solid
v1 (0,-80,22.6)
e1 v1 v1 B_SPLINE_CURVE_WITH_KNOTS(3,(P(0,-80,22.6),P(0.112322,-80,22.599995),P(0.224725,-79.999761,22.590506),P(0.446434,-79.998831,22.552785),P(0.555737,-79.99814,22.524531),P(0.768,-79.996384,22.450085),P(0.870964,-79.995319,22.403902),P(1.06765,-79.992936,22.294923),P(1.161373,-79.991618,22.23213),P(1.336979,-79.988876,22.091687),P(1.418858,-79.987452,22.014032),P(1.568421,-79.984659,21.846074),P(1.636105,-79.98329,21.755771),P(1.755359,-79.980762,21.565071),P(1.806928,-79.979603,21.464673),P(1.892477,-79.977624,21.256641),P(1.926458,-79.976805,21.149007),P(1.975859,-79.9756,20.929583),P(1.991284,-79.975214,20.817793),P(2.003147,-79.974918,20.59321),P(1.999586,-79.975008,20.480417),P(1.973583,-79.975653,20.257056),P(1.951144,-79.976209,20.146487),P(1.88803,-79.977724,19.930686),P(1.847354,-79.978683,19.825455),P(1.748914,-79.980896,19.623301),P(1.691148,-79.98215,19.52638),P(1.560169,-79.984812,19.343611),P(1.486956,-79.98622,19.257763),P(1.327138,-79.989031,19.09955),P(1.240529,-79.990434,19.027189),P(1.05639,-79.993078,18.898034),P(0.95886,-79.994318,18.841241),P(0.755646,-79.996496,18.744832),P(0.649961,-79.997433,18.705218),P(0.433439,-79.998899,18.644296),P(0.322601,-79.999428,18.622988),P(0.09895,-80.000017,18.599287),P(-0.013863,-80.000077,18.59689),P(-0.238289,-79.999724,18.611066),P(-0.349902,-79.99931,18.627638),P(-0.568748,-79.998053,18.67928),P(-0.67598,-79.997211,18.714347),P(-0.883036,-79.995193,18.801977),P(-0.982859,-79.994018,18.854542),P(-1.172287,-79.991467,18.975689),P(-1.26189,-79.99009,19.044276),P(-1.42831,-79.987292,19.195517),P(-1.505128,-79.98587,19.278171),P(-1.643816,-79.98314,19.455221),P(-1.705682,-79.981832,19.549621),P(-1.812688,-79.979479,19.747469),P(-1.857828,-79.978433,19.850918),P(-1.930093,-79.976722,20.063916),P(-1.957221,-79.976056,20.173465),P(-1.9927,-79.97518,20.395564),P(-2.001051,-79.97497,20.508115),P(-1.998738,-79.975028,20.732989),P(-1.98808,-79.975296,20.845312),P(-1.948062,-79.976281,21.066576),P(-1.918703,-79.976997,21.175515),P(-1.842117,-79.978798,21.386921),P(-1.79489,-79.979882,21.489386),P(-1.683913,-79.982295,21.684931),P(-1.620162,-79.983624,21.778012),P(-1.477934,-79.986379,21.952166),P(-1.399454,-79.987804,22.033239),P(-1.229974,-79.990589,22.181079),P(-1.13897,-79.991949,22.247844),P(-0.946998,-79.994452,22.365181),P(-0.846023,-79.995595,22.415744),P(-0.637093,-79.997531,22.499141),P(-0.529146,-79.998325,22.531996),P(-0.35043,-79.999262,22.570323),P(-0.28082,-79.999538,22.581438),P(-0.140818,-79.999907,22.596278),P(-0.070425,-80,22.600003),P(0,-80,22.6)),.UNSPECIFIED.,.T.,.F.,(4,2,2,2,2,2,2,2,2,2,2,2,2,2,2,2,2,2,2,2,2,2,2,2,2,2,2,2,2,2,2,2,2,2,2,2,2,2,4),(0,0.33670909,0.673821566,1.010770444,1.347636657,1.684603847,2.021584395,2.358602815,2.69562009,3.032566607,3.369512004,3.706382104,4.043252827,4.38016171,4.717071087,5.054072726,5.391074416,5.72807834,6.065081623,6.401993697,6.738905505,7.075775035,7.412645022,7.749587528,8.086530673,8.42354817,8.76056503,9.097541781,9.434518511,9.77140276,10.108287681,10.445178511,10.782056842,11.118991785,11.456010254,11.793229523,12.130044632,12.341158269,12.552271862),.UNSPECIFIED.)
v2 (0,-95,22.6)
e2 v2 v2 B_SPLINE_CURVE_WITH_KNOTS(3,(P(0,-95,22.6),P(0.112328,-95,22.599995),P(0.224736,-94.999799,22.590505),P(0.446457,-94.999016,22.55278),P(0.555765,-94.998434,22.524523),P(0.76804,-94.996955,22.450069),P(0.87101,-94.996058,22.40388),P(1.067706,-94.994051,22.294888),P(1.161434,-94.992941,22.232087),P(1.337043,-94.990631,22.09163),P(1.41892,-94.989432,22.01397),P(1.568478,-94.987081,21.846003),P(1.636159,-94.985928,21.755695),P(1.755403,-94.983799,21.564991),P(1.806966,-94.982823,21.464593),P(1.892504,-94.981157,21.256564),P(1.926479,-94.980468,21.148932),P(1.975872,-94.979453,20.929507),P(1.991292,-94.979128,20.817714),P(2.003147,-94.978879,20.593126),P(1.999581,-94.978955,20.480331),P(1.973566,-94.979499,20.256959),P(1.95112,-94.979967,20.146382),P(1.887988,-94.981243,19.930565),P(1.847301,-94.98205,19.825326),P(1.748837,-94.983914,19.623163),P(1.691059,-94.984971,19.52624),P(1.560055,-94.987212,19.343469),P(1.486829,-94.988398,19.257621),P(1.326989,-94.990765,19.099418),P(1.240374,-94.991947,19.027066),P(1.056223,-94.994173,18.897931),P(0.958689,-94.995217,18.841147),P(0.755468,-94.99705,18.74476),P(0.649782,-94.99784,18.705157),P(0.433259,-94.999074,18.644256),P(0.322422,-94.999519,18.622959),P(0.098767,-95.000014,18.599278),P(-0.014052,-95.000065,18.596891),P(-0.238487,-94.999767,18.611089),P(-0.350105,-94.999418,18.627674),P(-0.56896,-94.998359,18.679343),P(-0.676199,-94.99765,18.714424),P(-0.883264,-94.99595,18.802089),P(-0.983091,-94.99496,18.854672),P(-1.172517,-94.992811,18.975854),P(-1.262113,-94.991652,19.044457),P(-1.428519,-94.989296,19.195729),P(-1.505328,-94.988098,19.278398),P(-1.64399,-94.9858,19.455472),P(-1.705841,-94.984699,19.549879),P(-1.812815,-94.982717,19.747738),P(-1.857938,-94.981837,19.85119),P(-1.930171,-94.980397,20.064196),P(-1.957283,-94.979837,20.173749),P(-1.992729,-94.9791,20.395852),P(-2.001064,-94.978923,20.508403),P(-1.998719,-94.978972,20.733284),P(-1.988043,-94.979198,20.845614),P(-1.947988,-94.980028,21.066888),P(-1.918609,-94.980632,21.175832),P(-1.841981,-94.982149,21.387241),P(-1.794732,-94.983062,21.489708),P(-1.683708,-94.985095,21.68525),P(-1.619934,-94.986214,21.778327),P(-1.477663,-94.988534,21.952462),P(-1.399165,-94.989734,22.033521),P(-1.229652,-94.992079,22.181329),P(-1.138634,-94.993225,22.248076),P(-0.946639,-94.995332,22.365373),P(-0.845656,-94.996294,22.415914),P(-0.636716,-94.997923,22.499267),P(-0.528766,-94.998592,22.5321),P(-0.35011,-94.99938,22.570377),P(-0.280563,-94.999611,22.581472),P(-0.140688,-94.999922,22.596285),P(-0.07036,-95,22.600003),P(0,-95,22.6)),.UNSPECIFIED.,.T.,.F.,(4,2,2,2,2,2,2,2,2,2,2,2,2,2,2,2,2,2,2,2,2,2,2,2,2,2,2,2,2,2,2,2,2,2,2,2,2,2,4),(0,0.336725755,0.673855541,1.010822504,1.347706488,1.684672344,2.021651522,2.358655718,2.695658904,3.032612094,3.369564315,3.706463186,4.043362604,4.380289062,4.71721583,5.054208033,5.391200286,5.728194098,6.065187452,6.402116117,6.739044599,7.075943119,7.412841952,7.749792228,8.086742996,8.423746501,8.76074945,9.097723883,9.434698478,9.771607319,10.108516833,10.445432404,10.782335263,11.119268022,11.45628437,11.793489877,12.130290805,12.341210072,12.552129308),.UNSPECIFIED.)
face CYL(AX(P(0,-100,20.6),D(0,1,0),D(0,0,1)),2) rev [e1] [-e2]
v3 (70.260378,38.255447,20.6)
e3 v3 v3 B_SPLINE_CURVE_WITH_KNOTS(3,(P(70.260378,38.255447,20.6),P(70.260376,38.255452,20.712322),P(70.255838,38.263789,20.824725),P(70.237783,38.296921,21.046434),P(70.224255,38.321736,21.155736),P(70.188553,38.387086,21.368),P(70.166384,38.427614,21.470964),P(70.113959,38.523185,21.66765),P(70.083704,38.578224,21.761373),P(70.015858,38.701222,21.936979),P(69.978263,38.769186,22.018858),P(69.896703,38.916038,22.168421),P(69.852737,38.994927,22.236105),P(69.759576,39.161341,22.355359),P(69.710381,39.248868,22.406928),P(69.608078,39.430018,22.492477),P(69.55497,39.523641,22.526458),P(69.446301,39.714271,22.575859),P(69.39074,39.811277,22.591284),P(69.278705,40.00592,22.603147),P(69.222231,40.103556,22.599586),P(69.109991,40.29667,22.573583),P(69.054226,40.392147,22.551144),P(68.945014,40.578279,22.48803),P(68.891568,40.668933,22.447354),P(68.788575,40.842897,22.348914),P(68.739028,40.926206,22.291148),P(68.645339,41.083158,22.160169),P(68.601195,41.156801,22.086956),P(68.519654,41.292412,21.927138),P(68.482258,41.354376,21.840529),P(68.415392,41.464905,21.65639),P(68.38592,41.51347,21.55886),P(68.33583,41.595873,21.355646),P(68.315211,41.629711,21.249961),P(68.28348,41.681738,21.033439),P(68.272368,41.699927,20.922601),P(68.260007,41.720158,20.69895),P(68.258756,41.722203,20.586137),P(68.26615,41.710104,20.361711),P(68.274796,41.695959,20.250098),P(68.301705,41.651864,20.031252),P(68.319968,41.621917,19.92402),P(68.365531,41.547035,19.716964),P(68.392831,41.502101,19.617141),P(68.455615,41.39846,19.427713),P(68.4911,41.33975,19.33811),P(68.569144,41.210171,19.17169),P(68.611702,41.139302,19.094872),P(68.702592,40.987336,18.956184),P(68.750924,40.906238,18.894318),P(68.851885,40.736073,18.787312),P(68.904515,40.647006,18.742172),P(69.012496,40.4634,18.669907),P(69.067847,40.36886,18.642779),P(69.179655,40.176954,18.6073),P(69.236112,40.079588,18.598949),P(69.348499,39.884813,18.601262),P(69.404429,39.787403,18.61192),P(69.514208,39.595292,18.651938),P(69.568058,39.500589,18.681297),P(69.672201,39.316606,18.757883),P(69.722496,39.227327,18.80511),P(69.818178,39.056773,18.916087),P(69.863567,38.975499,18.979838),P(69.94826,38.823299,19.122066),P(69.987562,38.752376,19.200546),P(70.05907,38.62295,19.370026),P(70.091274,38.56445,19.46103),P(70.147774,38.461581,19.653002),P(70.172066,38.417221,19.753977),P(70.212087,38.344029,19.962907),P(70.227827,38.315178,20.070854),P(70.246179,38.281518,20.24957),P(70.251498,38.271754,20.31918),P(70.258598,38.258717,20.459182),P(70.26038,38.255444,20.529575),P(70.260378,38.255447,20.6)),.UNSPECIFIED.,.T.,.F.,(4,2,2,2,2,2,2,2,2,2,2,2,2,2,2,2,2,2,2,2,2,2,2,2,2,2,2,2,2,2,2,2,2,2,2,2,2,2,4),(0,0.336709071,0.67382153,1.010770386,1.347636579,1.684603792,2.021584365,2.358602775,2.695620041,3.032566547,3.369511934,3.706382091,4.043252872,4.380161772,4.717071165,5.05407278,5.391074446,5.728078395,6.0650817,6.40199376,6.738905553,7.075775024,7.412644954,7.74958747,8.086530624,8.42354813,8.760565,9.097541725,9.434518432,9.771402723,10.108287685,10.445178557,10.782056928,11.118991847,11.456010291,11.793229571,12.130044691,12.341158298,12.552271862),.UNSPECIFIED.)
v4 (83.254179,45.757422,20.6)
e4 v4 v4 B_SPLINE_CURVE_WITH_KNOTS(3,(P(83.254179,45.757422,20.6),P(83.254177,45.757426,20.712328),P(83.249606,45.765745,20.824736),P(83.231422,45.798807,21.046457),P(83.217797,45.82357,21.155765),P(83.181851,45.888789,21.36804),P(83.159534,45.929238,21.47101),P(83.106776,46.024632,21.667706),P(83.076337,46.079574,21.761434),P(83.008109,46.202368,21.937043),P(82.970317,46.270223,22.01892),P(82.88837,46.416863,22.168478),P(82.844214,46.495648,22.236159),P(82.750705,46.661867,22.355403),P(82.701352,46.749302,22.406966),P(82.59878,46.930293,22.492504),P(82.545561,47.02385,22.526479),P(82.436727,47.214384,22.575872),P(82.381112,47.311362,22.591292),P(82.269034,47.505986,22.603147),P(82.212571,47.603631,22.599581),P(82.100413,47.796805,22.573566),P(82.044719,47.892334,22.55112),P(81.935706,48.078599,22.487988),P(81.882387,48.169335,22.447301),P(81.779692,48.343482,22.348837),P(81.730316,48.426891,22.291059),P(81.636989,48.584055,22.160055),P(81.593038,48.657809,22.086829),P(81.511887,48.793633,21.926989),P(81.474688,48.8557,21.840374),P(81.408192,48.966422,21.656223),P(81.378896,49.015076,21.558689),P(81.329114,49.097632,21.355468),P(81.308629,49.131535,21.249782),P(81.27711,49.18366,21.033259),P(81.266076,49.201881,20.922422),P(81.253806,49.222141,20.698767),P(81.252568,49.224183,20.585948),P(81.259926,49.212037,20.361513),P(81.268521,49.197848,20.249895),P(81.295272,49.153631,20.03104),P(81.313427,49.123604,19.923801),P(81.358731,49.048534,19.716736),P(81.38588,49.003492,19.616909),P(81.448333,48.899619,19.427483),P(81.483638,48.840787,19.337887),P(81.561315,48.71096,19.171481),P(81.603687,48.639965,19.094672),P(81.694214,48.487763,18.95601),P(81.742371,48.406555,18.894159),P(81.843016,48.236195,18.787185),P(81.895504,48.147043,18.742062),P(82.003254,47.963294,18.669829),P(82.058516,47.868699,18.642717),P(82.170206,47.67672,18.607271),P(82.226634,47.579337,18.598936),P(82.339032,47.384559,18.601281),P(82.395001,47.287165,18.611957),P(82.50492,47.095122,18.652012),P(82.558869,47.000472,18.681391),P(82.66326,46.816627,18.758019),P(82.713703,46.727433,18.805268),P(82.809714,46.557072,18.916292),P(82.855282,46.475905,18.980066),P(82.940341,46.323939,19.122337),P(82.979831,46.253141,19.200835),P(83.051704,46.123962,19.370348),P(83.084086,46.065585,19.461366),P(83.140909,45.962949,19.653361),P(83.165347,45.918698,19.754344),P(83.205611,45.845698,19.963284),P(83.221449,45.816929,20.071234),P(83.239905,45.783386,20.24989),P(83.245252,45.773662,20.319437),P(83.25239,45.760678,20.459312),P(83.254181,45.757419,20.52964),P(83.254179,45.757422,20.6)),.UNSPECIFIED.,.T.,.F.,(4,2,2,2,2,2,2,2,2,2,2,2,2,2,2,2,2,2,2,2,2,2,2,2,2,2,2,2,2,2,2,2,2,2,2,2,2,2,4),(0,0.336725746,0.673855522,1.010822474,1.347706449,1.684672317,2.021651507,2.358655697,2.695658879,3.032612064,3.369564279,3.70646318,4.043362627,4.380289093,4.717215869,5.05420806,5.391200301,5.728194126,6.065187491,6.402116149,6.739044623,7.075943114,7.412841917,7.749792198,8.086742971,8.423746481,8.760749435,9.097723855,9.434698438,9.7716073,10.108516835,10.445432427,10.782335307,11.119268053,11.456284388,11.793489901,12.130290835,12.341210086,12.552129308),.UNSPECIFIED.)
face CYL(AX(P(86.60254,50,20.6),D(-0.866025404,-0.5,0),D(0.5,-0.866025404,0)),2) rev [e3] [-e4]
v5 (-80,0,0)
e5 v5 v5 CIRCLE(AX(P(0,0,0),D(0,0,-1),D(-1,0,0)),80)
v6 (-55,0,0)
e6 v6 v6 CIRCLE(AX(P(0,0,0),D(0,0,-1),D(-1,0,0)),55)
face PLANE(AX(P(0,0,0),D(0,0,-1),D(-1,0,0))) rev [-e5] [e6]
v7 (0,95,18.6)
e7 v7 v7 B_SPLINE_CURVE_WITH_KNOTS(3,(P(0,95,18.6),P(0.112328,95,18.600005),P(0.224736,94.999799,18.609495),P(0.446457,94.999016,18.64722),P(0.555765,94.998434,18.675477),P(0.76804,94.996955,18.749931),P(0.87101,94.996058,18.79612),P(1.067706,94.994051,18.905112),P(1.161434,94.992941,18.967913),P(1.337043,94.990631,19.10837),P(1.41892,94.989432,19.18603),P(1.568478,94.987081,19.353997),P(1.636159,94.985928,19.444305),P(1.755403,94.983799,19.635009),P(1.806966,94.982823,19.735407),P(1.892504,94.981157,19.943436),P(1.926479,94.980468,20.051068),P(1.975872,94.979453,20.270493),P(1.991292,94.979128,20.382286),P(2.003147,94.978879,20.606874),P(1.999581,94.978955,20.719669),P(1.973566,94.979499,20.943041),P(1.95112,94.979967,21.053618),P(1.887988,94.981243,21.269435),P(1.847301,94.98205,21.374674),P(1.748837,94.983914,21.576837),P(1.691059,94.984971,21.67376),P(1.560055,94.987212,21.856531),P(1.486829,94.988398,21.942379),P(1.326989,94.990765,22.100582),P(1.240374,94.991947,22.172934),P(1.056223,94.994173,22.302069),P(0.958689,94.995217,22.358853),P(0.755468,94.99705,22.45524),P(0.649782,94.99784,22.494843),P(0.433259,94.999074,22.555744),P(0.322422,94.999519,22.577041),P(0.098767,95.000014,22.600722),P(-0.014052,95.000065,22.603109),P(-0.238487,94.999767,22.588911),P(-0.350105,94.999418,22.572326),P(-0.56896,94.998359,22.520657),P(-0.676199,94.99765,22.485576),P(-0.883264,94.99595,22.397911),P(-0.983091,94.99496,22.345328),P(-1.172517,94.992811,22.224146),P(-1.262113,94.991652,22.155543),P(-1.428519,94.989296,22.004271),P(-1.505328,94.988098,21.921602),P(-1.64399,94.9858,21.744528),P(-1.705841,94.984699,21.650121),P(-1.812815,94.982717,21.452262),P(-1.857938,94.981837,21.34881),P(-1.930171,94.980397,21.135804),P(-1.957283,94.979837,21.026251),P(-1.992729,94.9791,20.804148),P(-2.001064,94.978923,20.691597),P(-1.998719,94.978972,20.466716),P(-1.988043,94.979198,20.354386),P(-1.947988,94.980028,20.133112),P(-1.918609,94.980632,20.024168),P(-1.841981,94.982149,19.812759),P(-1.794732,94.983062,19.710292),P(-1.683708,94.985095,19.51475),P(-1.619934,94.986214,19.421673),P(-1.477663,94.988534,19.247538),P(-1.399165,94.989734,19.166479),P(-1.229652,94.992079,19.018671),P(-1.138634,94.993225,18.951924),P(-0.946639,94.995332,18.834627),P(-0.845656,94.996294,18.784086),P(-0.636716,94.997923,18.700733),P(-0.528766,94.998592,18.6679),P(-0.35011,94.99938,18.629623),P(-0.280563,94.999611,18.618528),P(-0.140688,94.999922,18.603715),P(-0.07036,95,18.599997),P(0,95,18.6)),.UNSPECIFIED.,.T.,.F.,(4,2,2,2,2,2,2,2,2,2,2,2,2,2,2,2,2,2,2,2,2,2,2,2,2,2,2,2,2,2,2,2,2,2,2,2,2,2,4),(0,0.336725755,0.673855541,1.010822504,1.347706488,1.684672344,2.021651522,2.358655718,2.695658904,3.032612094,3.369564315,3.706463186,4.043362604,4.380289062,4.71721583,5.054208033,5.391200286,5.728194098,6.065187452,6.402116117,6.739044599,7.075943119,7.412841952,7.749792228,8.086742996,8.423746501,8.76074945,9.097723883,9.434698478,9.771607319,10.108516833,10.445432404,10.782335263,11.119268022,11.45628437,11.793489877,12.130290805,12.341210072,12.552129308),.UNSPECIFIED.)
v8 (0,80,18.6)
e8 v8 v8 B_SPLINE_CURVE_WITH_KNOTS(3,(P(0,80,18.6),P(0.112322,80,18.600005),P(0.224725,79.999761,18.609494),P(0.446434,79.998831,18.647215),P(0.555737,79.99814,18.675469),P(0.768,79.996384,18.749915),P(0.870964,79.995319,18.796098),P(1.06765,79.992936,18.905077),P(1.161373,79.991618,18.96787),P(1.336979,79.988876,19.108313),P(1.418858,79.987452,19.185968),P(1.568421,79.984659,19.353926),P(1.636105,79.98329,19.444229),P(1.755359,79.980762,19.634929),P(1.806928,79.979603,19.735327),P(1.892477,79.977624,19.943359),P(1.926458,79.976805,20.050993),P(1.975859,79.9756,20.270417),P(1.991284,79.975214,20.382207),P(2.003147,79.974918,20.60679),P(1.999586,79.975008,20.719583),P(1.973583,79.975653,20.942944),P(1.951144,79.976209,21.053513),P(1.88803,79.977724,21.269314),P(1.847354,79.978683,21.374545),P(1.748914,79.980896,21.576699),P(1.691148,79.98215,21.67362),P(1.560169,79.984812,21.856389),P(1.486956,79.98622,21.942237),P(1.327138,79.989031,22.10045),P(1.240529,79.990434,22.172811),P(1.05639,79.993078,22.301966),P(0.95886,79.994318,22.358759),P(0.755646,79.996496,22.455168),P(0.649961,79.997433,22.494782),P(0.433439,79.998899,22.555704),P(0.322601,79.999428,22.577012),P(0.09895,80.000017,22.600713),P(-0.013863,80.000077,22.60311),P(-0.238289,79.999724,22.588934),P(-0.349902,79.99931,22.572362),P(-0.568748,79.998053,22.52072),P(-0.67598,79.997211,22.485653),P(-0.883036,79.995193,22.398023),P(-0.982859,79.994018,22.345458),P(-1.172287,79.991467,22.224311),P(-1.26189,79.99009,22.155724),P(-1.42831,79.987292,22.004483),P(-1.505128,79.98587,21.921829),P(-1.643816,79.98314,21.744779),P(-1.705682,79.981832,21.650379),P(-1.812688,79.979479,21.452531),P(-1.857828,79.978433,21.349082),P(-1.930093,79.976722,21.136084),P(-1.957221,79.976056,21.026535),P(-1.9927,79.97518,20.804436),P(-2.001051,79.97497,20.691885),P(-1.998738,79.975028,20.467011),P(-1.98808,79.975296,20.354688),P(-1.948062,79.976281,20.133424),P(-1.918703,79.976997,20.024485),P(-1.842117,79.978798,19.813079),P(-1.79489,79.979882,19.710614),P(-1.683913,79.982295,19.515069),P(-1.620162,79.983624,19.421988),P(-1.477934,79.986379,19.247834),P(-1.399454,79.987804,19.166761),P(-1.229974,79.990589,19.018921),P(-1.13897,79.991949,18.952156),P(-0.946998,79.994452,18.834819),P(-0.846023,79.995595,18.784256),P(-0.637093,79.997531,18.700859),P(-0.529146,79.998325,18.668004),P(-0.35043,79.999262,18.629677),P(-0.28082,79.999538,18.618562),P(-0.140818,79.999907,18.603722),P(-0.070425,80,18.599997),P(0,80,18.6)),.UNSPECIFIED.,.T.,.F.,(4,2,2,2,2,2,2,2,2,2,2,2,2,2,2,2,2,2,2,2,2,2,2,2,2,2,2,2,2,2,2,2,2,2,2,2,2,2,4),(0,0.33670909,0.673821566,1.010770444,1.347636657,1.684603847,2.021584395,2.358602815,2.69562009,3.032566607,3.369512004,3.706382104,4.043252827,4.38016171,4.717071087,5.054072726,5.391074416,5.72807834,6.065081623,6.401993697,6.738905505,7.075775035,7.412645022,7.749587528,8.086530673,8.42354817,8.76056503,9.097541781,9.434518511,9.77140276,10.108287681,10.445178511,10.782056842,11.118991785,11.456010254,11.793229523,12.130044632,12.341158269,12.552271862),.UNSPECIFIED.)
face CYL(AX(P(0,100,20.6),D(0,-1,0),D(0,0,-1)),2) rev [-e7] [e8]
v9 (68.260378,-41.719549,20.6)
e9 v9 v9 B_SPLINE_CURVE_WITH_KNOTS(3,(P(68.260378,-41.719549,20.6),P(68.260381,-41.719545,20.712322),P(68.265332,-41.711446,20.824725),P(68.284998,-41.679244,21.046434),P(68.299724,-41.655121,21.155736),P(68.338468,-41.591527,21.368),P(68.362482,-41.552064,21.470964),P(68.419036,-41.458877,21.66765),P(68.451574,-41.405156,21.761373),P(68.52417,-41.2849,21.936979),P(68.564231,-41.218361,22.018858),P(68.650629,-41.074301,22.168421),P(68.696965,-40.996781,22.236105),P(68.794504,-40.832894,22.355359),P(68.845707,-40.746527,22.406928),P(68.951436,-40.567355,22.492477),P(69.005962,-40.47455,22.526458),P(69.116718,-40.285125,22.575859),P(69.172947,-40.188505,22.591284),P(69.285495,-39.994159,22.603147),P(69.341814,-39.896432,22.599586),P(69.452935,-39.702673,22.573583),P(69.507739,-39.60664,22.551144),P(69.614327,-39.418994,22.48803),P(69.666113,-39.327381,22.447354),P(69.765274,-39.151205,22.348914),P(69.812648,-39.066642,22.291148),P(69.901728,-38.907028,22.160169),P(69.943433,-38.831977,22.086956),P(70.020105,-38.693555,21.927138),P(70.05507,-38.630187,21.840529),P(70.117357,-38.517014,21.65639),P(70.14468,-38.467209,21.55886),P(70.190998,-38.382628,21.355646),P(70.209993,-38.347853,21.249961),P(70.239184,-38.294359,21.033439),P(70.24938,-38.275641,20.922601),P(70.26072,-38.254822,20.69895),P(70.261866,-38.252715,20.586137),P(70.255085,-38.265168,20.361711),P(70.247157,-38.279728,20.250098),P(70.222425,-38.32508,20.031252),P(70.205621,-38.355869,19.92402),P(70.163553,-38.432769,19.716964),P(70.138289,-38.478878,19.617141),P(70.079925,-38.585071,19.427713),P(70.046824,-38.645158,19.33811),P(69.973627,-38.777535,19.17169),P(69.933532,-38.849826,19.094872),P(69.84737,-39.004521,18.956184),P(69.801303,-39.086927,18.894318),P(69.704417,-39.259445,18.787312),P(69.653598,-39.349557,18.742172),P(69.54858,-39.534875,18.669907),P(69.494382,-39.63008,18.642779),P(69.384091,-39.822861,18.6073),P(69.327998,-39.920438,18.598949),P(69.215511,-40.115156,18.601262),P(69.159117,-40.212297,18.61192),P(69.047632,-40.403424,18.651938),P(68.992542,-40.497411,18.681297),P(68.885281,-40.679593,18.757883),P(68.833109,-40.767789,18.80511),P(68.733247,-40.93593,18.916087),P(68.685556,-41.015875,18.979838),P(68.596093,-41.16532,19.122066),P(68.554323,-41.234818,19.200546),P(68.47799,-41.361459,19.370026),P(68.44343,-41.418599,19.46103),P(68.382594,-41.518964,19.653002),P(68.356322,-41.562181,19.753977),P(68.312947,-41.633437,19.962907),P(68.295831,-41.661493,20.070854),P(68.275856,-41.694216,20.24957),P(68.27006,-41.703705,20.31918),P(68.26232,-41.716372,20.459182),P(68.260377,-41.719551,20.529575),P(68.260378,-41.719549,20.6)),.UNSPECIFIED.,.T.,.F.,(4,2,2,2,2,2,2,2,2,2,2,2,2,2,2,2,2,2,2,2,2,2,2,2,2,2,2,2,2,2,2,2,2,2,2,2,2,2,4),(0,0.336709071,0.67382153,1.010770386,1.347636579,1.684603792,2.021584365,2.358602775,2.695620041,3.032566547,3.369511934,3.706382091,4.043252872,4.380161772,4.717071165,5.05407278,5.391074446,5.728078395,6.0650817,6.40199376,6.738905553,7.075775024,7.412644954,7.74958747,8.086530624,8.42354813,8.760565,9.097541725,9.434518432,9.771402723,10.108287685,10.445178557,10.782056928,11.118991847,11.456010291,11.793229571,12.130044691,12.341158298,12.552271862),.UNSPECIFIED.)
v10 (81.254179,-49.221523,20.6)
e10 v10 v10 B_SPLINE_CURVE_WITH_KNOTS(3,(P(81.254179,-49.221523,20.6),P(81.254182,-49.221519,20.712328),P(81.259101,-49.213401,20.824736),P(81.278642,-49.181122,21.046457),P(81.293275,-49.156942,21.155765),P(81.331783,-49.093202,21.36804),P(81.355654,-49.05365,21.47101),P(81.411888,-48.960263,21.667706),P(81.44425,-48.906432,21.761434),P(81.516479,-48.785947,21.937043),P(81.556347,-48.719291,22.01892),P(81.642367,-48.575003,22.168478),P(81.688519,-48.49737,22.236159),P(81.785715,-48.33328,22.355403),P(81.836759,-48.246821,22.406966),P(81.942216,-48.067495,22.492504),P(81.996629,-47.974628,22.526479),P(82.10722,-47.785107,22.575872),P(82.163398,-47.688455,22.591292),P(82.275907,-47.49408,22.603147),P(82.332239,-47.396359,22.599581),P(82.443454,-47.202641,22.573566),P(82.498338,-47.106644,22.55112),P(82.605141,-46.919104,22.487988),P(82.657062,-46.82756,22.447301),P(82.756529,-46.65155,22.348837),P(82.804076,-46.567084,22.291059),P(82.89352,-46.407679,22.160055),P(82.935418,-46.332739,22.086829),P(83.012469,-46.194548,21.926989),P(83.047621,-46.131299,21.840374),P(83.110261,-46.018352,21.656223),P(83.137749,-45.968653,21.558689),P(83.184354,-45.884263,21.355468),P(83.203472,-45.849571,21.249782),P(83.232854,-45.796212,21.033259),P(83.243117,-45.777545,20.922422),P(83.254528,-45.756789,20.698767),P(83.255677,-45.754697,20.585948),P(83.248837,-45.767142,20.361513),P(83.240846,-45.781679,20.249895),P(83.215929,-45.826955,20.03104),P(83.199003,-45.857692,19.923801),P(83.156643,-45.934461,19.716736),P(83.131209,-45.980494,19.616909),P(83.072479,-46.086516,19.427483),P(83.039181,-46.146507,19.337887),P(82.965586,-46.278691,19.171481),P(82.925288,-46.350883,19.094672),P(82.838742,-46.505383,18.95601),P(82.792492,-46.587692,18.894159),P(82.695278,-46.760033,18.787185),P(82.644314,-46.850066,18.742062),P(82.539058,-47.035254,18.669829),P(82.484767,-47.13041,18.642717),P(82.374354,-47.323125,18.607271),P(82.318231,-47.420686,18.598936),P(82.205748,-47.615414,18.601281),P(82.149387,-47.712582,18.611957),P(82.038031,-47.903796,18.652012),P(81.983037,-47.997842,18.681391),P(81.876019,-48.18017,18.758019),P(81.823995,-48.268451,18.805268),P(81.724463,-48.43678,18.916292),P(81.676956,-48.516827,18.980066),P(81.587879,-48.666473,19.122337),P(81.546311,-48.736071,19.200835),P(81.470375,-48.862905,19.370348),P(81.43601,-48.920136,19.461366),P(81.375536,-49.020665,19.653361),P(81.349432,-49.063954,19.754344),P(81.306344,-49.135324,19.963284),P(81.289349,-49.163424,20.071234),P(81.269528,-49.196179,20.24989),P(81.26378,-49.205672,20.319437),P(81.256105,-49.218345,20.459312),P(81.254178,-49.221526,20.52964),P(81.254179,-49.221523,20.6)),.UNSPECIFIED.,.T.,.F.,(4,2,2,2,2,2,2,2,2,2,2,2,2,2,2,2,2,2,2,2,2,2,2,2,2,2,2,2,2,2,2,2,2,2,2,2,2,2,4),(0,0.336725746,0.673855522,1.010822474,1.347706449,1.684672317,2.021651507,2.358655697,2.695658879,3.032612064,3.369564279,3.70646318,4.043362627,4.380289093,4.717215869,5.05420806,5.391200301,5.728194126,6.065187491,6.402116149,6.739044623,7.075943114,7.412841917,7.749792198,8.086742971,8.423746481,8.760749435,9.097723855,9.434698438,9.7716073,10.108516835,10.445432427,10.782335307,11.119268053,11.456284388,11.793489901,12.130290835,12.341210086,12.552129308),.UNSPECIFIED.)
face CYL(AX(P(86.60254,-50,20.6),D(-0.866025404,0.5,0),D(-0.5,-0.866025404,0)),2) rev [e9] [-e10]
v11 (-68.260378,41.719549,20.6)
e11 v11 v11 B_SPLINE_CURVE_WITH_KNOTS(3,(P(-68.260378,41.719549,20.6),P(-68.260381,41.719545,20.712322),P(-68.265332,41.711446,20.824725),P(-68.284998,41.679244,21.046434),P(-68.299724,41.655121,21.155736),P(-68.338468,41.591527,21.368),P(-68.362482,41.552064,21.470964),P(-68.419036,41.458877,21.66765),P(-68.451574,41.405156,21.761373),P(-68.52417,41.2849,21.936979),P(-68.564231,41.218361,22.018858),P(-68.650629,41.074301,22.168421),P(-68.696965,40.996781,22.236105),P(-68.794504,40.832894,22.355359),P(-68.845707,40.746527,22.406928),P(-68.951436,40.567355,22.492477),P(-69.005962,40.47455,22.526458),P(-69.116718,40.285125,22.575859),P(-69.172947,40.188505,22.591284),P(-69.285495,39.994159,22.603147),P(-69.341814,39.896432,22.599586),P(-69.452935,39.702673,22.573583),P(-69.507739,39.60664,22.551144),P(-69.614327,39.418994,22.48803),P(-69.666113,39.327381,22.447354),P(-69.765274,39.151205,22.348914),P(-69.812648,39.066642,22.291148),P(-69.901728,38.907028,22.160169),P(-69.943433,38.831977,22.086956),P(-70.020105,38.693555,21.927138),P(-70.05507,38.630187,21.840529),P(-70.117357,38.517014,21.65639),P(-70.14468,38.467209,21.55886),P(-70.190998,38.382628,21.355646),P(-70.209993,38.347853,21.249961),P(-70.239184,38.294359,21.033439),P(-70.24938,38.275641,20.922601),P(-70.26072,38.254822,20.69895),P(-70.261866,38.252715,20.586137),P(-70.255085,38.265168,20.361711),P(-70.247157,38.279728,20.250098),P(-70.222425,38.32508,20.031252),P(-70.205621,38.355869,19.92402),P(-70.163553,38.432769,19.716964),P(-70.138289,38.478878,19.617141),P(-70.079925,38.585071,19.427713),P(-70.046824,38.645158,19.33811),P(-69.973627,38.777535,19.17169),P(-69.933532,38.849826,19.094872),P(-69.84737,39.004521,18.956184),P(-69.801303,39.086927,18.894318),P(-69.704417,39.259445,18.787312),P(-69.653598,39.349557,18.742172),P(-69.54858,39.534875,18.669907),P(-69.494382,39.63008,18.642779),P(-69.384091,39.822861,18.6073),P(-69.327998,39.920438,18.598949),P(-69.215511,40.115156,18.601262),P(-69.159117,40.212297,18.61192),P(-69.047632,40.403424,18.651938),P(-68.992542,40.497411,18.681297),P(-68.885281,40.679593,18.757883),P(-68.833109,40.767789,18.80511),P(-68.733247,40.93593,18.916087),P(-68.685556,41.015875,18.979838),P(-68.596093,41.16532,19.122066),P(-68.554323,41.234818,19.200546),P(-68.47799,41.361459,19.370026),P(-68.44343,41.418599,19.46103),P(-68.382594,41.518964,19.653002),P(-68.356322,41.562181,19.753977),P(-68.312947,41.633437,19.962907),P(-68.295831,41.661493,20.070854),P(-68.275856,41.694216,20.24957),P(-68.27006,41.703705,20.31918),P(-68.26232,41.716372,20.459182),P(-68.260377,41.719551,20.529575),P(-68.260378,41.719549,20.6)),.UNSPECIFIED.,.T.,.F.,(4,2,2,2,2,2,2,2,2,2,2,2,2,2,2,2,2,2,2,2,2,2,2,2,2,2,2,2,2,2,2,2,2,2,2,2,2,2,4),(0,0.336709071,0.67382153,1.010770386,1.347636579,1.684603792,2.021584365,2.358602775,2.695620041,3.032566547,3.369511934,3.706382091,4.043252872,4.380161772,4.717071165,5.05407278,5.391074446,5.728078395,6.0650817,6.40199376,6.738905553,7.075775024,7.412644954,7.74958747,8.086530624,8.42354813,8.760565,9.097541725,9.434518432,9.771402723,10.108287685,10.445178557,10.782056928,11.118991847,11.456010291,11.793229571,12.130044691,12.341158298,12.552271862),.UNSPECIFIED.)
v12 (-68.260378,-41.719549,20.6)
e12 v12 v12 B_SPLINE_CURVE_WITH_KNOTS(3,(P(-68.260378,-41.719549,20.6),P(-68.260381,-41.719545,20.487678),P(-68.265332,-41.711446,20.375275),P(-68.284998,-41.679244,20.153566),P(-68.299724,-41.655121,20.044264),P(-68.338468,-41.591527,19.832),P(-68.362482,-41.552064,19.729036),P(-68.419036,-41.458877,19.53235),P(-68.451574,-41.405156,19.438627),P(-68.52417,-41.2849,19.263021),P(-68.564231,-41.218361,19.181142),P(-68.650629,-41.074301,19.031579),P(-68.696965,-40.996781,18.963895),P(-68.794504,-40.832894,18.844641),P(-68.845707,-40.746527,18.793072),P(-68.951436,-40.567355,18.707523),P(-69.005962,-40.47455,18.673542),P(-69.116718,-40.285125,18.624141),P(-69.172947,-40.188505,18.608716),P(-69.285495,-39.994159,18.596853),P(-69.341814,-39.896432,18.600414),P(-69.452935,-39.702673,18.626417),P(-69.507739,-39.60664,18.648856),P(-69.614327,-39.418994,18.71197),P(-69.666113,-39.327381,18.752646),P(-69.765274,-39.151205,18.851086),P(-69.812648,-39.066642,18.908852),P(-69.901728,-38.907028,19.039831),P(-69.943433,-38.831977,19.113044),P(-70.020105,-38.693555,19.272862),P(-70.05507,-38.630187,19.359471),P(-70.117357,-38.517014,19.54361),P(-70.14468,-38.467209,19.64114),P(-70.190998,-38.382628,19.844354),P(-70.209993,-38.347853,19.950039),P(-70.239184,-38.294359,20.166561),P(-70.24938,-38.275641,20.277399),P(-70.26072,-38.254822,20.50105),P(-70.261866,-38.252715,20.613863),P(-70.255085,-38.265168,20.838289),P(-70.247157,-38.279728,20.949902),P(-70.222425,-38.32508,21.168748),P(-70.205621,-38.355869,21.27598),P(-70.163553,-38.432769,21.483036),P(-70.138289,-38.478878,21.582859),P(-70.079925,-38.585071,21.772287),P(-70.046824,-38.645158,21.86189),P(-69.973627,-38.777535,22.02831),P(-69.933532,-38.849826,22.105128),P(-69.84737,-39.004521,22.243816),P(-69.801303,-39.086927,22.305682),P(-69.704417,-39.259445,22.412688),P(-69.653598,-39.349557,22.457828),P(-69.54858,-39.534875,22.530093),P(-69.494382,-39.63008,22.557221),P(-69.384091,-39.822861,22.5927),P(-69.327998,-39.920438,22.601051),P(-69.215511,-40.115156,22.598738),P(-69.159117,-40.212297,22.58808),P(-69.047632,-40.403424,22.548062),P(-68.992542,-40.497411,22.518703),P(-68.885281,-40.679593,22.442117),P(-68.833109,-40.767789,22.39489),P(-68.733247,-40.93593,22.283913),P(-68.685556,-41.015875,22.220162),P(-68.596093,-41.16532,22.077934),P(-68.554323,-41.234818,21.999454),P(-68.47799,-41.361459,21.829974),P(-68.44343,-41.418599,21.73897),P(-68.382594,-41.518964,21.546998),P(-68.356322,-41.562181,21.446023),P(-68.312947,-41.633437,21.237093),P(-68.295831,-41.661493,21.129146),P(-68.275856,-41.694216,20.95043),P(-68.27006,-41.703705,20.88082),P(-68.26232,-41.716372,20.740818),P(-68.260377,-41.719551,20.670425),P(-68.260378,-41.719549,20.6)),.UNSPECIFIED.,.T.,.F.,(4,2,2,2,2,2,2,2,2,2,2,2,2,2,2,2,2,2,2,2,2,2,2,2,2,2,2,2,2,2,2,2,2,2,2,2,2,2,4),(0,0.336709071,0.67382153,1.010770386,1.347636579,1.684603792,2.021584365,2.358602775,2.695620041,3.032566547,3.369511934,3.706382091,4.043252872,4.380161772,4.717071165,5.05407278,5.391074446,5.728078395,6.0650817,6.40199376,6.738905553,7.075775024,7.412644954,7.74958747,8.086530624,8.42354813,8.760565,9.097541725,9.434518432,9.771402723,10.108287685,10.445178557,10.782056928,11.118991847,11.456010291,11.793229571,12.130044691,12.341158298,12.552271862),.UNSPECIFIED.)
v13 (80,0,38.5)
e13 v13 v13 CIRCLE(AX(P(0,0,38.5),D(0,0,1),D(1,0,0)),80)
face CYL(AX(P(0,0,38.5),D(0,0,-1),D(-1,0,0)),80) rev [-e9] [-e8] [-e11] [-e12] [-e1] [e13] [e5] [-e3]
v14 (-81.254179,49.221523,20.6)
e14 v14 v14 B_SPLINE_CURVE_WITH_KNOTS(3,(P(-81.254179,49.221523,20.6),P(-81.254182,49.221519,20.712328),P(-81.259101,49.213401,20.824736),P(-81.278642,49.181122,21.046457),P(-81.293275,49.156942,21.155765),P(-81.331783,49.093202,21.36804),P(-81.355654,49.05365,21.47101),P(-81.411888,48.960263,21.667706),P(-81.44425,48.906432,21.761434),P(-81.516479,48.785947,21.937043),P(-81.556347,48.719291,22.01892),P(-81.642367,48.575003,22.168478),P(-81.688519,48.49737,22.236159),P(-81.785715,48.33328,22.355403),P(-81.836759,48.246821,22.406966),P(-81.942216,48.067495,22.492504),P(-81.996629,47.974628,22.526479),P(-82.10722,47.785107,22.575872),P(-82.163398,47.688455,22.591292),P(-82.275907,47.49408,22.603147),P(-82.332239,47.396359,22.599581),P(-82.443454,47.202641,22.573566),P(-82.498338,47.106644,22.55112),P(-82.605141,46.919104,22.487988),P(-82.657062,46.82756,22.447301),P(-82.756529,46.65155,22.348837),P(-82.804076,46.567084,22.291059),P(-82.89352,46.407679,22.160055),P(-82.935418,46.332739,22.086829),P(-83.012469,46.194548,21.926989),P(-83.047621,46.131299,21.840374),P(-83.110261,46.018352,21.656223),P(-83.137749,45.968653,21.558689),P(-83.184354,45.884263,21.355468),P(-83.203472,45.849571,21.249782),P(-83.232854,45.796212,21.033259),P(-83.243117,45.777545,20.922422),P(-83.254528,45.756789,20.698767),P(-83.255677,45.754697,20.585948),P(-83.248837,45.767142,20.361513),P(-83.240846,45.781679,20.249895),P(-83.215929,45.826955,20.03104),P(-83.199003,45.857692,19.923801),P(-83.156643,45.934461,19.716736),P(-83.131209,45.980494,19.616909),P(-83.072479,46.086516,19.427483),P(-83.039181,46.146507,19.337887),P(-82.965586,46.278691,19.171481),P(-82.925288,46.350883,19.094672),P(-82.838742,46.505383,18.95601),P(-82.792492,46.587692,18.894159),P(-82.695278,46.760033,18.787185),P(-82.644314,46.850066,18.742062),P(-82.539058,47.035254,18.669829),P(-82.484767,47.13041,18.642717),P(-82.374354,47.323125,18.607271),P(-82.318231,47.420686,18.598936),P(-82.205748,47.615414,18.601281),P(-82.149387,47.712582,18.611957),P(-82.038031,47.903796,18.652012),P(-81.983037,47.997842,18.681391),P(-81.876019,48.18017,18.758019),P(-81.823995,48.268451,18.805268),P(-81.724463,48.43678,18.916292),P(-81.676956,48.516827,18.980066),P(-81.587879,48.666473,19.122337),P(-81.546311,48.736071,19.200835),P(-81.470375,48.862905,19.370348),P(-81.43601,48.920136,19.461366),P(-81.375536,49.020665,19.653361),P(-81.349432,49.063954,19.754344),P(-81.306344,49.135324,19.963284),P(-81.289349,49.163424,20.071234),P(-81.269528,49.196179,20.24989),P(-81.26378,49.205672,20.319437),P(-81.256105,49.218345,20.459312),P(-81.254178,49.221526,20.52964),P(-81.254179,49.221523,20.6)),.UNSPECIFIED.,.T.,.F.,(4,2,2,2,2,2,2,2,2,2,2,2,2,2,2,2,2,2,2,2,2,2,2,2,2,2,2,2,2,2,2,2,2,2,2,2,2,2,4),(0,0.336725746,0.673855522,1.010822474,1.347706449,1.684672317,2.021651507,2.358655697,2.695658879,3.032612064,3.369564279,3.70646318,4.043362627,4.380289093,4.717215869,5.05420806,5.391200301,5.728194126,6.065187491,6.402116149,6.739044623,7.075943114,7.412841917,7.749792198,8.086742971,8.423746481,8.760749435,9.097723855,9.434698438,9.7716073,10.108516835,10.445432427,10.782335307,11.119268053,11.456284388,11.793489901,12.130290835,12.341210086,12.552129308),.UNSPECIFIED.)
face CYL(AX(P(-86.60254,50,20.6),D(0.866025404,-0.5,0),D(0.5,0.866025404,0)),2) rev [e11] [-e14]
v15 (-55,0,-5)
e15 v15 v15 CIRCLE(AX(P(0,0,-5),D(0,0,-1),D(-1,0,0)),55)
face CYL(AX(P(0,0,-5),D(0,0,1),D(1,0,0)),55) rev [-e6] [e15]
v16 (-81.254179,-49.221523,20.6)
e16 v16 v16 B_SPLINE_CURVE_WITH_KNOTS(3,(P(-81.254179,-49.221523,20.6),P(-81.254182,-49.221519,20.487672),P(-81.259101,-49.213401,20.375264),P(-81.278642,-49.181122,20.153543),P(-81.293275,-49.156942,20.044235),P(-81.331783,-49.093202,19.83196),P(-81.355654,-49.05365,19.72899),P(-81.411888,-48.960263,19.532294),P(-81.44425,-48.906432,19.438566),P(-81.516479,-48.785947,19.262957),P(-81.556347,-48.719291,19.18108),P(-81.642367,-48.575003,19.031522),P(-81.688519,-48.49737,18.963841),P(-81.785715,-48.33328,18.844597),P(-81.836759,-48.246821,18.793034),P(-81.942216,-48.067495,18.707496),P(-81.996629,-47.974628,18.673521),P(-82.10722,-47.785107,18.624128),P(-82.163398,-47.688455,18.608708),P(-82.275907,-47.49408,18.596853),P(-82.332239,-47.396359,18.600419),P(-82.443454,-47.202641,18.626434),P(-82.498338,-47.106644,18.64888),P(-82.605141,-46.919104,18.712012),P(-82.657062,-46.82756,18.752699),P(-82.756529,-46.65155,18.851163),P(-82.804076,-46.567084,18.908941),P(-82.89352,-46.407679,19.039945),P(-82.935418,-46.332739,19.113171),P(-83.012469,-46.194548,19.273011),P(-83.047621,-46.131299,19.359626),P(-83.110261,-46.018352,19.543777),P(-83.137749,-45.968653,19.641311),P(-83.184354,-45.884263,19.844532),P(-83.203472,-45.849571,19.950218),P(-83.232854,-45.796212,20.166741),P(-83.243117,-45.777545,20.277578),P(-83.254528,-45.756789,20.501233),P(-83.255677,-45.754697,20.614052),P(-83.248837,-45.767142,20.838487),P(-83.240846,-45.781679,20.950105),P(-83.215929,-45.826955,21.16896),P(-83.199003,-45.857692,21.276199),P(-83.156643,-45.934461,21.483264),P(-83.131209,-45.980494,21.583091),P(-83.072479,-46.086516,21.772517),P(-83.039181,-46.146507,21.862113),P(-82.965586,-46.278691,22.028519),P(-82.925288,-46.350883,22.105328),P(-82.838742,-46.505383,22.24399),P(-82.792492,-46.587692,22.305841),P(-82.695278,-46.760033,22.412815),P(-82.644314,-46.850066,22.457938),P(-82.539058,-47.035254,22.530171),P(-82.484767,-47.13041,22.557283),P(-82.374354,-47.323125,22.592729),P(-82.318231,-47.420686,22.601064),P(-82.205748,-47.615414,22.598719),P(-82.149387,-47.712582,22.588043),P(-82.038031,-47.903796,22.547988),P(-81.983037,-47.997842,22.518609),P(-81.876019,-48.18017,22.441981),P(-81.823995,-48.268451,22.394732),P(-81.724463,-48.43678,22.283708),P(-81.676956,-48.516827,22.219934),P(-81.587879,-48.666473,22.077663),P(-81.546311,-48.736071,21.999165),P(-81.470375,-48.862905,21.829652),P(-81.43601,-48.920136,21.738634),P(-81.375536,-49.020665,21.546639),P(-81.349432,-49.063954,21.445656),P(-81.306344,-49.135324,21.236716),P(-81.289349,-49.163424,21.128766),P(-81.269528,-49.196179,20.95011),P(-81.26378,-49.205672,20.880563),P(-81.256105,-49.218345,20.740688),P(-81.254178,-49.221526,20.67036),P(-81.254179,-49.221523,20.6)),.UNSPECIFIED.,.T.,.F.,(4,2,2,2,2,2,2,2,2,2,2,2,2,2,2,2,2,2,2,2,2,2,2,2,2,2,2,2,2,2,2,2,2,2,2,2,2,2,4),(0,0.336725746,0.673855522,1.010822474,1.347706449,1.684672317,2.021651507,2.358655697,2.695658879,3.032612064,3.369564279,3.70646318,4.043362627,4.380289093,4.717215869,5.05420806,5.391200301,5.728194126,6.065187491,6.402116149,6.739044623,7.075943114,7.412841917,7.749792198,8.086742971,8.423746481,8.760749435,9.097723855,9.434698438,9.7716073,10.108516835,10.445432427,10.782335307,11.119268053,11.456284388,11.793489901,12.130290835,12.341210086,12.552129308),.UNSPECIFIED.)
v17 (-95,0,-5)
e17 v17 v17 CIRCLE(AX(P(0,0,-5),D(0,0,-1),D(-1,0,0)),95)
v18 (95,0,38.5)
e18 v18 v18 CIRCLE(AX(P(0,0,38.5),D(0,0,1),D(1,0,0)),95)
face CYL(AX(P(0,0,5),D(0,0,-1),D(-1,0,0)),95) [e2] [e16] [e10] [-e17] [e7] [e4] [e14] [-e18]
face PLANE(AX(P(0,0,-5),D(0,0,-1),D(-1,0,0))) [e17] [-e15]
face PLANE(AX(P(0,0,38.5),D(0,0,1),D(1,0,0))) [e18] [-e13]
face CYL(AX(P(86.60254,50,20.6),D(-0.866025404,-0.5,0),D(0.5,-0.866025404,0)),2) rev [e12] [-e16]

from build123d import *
from build123d.topology import SkipClean

# Parameters (mm, degrees)
SKETCH_1_R               = 95
SKETCH_1_R_2             = 55
EXTRUDE_1_DEPTH          = 5
SKETCH_2_R               = 95
SKETCH_2_R_2             = 80
EXTRUDE_2_DEPTH          = 38.5
SKETCH_3_R               = 2
CUT_EXTRUDE_2_DEPTH      = 100
PATTERN_CIRCULAR_2_COUNT = 6
SKETCH_5_R               = 80
CUT_EXTRUDE_3_DEPTH      = 20
EXTRUDE_START            = 5
SKETCH_6_R               = 95
SKETCH_6_R_2             = 55
EXTRUDE_3_DEPTH          = 5


with BuildPart() as part:
    # 草图1 → 凸台-拉伸1 (new body)
    with BuildSketch(Plane.XY):
        Circle(SKETCH_1_R)
        Circle(SKETCH_1_R_2, mode=Mode.SUBTRACT)
    extrude(amount=EXTRUDE_1_DEPTH)

    # 草图2 → 凸台-拉伸2 (add)
    with BuildSketch(Plane.XY):
        Circle(SKETCH_2_R)
        Circle(SKETCH_2_R_2, mode=Mode.SUBTRACT)
    extrude(amount=EXTRUDE_2_DEPTH)

    # 草图3 → 切除-拉伸2 (cut)
    with BuildSketch(Plane(origin=(0, 0, 0), x_dir=(1, 0, 0), z_dir=(0, 1, 0))):
        with Locations((0, -20.6)):
            Circle(SKETCH_3_R)
    cut_extrude_2 = extrude(amount=-CUT_EXTRUDE_2_DEPTH, mode=Mode.SUBTRACT)

    # 阵列(圆周)2: 切除-拉伸2 ×6 about axis
    pattern_circular_2_axis = Axis((0, 0, 5), (0, 0, -1))
    for i in range(1, PATTERN_CIRCULAR_2_COUNT):
        add(cut_extrude_2.rotate(pattern_circular_2_axis, i * 360 / PATTERN_CIRCULAR_2_COUNT), mode=Mode.SUBTRACT)

    # 草图5 → 切除-拉伸3 (cut)
    with SkipClean():  # the faces are left unmerged after this step: merging them gives an invalid solid
        with BuildSketch(Plane(origin=(0, 0, 0), x_dir=(-1, 0, 0), z_dir=(0, 0, -1))):
            Circle(SKETCH_5_R)
        extrude(amount=-CUT_EXTRUDE_3_DEPTH, mode=Mode.SUBTRACT)
    add(part.part.scale(1), mode=Mode.REPLACE)  # the faces are merged on a copy

    # 草图6 → 凸台-拉伸3 (add)
    with SkipClean():  # the faces are left unmerged after this step: merging them gives an invalid solid
        with BuildSketch(Plane(origin=(0, 0, 0), x_dir=(-1, 0, 0), z_dir=(0, 0, -1)).offset(EXTRUDE_START)):
            Circle(SKETCH_6_R)
            Circle(SKETCH_6_R_2, mode=Mode.SUBTRACT)
        extrude(amount=-EXTRUDE_3_DEPTH)


solid = part.part
